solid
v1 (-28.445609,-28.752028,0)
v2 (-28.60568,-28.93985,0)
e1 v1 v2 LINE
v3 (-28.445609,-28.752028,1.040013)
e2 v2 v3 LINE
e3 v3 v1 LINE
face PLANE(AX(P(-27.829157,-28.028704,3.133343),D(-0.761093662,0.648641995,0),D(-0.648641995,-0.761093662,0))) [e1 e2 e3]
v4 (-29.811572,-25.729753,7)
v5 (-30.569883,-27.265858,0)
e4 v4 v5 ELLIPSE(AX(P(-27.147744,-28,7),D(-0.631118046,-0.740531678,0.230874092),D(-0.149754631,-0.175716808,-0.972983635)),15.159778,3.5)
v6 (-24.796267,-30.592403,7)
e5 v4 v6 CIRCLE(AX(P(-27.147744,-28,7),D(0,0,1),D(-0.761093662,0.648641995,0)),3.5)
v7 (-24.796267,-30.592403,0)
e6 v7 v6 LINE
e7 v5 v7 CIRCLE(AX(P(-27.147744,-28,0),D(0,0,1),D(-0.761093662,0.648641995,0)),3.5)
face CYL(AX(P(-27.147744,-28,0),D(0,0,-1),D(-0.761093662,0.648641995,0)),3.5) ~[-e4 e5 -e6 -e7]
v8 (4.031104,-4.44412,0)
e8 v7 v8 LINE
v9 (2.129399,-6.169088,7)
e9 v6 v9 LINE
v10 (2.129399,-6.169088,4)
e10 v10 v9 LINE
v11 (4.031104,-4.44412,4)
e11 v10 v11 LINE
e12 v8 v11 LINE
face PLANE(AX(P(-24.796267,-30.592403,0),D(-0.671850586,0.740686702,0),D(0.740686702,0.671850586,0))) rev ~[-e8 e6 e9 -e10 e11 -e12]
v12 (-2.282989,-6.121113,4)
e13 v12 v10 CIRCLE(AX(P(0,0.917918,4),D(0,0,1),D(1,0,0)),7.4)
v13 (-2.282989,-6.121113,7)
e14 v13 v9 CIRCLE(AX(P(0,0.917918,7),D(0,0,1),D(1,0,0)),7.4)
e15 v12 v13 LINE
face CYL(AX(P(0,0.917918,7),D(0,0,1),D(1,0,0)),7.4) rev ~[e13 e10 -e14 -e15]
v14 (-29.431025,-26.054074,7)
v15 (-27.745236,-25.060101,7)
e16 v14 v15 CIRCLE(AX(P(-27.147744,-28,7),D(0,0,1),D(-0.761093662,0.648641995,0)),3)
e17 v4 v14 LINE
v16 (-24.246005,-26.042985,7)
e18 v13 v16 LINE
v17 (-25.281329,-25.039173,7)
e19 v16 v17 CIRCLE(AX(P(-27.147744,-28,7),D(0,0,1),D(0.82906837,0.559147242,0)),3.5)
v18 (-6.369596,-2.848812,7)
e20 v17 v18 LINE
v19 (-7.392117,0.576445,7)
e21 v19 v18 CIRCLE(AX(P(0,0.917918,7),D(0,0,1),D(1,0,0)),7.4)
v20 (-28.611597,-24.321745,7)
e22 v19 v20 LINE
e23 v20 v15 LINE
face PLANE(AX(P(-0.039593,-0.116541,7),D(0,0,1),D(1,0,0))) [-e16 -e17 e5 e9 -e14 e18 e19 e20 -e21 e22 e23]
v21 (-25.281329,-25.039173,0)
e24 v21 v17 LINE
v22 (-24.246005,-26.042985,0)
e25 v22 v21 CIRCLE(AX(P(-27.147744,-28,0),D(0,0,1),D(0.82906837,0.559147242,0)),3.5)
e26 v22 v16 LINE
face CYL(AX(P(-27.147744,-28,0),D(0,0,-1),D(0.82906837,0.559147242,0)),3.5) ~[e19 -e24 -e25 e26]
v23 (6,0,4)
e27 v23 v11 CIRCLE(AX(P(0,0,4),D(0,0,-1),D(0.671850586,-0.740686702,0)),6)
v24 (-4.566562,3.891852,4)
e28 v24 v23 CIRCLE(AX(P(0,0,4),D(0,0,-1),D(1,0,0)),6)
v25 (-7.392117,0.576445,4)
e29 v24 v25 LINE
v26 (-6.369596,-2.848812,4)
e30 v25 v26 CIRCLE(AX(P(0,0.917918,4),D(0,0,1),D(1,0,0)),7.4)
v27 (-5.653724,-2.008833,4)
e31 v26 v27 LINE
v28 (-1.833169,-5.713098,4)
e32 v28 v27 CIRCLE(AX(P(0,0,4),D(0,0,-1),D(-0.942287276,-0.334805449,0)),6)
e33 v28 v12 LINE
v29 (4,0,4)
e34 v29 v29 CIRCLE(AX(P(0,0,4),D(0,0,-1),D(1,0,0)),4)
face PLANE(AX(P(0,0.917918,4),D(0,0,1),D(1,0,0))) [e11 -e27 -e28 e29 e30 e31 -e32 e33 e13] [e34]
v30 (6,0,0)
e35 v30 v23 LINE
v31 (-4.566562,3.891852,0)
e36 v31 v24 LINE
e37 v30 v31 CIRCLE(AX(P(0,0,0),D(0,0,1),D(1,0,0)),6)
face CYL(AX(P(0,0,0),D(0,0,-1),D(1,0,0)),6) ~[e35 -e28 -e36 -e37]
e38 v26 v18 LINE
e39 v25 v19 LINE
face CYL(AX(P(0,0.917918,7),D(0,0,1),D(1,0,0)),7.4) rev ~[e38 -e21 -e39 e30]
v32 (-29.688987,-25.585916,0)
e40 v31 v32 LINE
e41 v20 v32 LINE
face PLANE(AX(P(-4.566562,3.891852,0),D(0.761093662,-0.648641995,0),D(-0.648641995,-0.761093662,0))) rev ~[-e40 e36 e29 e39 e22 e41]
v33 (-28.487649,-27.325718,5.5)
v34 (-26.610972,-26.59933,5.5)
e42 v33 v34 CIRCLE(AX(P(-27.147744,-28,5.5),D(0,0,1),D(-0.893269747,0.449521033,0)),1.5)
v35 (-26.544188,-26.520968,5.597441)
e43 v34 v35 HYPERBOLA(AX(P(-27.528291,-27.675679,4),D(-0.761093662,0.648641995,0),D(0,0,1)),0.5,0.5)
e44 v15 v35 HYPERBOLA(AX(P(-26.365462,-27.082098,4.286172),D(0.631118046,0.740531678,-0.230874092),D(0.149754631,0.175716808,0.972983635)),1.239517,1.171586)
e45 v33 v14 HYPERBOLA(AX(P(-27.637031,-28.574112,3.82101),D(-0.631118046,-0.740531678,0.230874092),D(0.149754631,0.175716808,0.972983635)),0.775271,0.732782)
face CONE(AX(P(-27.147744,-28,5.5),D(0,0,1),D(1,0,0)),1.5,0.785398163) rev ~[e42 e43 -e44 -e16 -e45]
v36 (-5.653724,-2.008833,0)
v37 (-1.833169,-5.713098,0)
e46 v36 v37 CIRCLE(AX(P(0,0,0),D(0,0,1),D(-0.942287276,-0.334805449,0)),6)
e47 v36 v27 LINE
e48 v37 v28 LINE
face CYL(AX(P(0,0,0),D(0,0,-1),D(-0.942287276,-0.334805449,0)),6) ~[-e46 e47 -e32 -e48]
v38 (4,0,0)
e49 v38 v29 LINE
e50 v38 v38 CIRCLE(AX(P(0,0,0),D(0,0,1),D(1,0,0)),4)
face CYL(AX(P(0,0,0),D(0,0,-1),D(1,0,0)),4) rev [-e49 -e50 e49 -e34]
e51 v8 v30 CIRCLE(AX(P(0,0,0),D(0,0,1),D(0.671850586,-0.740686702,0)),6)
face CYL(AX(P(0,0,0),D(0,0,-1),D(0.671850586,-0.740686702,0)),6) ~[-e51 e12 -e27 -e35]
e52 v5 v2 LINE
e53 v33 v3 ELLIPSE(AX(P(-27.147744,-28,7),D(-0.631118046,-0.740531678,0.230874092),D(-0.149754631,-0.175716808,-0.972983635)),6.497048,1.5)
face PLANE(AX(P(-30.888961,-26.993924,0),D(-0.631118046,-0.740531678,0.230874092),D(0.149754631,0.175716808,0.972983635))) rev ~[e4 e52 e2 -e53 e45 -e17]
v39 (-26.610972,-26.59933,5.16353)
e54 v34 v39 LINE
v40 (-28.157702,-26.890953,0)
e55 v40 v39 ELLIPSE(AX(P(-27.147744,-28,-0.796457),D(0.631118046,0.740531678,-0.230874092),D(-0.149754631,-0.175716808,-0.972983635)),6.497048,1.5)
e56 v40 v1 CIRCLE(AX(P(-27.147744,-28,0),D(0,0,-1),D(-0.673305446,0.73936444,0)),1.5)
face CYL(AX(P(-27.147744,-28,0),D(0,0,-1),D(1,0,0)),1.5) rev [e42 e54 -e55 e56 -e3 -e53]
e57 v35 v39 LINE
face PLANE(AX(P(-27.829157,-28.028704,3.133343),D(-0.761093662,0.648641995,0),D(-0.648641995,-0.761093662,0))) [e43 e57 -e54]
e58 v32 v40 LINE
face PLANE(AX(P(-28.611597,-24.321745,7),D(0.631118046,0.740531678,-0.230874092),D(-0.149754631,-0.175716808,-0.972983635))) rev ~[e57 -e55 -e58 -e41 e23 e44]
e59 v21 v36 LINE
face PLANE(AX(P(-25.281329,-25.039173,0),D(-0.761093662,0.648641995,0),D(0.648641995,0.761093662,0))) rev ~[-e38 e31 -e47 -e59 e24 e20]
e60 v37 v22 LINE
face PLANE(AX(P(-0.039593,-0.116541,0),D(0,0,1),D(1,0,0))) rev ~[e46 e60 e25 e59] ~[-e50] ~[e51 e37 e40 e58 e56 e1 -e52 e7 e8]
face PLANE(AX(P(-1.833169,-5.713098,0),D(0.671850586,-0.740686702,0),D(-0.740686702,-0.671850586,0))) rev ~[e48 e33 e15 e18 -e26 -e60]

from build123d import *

# Parameters (mm, degrees)
F0_R     = 4
F0_R_2   = 1.5
F1_DEPTH = 7
F2_R     = 7.4
F3_DEPTH = 3
F4_SIZE  = 1.5
F6_DEPTH = 3


with BuildPart() as f1:
    # F0 (on Top) → F1 (new body)
    with BuildSketch(Plane.XY):
        with BuildLine():
            ThreePointArc((4.0311035144, -4.4441202117), (5.48573701, -2.4303681731), (6, 0))
            ThreePointArc((6, 0), (2.0737198646, 5.6302474122), (-4.5665619744, 3.8918519671))
            ThreePointArc((-4.5665619744, 3.8918519671), (-5.9006846613, 1.0871616841), (-5.6537236585, -2.0088326942))
            ThreePointArc((-5.6537236585, -2.0088326942), (-4.1765759878, -4.3076923077), (-1.8331692436, -5.7130981546))
            ThreePointArc((-1.8331692436, -5.7130981546), (1.2689779429, -5.864272758), (4.0311035144, -4.4441202117))
        make_face()
        Circle(F0_R, mode=Mode.SUBTRACT)
        with BuildLine():
            ThreePointArc((-5.6537236585, -2.0088326942), (-5.9006846613, 1.0871616841), (-4.5665619744, 3.8918519671))
            Line((-4.5665619744, 3.8918519671), (-29.8115717394, -25.7297530192))
            ThreePointArc((-29.8115717394, -25.7297530192), (-27.6751829567, -24.5399699331), (-25.2813289713, -25.0391732176))
            Line((-25.2813289713, -25.0391732176), (-5.6537236585, -2.0088326942))
        make_face()
        with BuildLine():
            Line((-24.7962668709, -30.5924034568), (4.0311035144, -4.4441202117))
            ThreePointArc((4.0311035144, -4.4441202117), (1.2689779429, -5.864272758), (-1.8331692436, -5.7130981546))
            Line((-1.8331692436, -5.7130981546), (-24.2460046276, -26.0429846518))
            ThreePointArc((-24.2460046276, -26.0429846518), (-23.8006490966, -26.9767912058), (-23.647743921, -28))
            ThreePointArc((-23.647743921, -28), (-23.9477306651, -29.4177147676), (-24.7962668709, -30.5924034568))
        make_face()
        with BuildLine():
            ThreePointArc((-25.2813289713, -25.0391732176), (-27.6751829567, -24.5399699331), (-29.8115717394, -25.7297530192))
            ThreePointArc((-29.8115717394, -25.7297530192), (-29.5840799139, -30.5128205128), (-24.7962668709, -30.5924034568))
            ThreePointArc((-24.7962668709, -30.5924034568), (-23.9477306651, -29.4177147676), (-23.647743921, -28))
            ThreePointArc((-23.647743921, -28), (-23.8006490966, -26.9767912058), (-24.2460046276, -26.0429846518))
            ThreePointArc((-24.2460046276, -26.0429846518), (-24.7114079281, -25.4871794872), (-25.2813289713, -25.0391732176))
        make_face()
        with Locations((-27.147743921, -28)):
            Circle(F0_R_2, mode=Mode.SUBTRACT)
    extrude(amount=F1_DEPTH)

    # F2 (on face) → F3 (cut)
    with BuildSketch(Plane.XY.offset(7)):
        with Locations((0, 0.9179179191)):
            Circle(F2_R)
    extrude(amount=-F3_DEPTH, mode=Mode.SUBTRACT)

    # F4
    f4_edges = [f1.edges().sort_by_distance(p)[0] for p in [
        (-28.647744, -28, 7),
    ]]
    chamfer(f4_edges, length=F4_SIZE)

    # F5 (on face) → F6 (cut)
    with BuildSketch(Plane(origin=(-4.5665619744, 3.8918519671, 0), x_dir=(-0.6486419945, -0.7610936624, 0), z_dir=(-0.7610936624, 0.6486419945, 0))):
        Polygon((40.5807819354, 0), (38.9197893108, 7), (38.9197893108, 0), align=None)
        Polygon((38.9197893108, 0), (38.9197893108, 7), (37.0698095831, 7), (38.7308022077, 0), align=None)
    extrude(amount=-F6_DEPTH, mode=Mode.SUBTRACT)


solid = f1.part
